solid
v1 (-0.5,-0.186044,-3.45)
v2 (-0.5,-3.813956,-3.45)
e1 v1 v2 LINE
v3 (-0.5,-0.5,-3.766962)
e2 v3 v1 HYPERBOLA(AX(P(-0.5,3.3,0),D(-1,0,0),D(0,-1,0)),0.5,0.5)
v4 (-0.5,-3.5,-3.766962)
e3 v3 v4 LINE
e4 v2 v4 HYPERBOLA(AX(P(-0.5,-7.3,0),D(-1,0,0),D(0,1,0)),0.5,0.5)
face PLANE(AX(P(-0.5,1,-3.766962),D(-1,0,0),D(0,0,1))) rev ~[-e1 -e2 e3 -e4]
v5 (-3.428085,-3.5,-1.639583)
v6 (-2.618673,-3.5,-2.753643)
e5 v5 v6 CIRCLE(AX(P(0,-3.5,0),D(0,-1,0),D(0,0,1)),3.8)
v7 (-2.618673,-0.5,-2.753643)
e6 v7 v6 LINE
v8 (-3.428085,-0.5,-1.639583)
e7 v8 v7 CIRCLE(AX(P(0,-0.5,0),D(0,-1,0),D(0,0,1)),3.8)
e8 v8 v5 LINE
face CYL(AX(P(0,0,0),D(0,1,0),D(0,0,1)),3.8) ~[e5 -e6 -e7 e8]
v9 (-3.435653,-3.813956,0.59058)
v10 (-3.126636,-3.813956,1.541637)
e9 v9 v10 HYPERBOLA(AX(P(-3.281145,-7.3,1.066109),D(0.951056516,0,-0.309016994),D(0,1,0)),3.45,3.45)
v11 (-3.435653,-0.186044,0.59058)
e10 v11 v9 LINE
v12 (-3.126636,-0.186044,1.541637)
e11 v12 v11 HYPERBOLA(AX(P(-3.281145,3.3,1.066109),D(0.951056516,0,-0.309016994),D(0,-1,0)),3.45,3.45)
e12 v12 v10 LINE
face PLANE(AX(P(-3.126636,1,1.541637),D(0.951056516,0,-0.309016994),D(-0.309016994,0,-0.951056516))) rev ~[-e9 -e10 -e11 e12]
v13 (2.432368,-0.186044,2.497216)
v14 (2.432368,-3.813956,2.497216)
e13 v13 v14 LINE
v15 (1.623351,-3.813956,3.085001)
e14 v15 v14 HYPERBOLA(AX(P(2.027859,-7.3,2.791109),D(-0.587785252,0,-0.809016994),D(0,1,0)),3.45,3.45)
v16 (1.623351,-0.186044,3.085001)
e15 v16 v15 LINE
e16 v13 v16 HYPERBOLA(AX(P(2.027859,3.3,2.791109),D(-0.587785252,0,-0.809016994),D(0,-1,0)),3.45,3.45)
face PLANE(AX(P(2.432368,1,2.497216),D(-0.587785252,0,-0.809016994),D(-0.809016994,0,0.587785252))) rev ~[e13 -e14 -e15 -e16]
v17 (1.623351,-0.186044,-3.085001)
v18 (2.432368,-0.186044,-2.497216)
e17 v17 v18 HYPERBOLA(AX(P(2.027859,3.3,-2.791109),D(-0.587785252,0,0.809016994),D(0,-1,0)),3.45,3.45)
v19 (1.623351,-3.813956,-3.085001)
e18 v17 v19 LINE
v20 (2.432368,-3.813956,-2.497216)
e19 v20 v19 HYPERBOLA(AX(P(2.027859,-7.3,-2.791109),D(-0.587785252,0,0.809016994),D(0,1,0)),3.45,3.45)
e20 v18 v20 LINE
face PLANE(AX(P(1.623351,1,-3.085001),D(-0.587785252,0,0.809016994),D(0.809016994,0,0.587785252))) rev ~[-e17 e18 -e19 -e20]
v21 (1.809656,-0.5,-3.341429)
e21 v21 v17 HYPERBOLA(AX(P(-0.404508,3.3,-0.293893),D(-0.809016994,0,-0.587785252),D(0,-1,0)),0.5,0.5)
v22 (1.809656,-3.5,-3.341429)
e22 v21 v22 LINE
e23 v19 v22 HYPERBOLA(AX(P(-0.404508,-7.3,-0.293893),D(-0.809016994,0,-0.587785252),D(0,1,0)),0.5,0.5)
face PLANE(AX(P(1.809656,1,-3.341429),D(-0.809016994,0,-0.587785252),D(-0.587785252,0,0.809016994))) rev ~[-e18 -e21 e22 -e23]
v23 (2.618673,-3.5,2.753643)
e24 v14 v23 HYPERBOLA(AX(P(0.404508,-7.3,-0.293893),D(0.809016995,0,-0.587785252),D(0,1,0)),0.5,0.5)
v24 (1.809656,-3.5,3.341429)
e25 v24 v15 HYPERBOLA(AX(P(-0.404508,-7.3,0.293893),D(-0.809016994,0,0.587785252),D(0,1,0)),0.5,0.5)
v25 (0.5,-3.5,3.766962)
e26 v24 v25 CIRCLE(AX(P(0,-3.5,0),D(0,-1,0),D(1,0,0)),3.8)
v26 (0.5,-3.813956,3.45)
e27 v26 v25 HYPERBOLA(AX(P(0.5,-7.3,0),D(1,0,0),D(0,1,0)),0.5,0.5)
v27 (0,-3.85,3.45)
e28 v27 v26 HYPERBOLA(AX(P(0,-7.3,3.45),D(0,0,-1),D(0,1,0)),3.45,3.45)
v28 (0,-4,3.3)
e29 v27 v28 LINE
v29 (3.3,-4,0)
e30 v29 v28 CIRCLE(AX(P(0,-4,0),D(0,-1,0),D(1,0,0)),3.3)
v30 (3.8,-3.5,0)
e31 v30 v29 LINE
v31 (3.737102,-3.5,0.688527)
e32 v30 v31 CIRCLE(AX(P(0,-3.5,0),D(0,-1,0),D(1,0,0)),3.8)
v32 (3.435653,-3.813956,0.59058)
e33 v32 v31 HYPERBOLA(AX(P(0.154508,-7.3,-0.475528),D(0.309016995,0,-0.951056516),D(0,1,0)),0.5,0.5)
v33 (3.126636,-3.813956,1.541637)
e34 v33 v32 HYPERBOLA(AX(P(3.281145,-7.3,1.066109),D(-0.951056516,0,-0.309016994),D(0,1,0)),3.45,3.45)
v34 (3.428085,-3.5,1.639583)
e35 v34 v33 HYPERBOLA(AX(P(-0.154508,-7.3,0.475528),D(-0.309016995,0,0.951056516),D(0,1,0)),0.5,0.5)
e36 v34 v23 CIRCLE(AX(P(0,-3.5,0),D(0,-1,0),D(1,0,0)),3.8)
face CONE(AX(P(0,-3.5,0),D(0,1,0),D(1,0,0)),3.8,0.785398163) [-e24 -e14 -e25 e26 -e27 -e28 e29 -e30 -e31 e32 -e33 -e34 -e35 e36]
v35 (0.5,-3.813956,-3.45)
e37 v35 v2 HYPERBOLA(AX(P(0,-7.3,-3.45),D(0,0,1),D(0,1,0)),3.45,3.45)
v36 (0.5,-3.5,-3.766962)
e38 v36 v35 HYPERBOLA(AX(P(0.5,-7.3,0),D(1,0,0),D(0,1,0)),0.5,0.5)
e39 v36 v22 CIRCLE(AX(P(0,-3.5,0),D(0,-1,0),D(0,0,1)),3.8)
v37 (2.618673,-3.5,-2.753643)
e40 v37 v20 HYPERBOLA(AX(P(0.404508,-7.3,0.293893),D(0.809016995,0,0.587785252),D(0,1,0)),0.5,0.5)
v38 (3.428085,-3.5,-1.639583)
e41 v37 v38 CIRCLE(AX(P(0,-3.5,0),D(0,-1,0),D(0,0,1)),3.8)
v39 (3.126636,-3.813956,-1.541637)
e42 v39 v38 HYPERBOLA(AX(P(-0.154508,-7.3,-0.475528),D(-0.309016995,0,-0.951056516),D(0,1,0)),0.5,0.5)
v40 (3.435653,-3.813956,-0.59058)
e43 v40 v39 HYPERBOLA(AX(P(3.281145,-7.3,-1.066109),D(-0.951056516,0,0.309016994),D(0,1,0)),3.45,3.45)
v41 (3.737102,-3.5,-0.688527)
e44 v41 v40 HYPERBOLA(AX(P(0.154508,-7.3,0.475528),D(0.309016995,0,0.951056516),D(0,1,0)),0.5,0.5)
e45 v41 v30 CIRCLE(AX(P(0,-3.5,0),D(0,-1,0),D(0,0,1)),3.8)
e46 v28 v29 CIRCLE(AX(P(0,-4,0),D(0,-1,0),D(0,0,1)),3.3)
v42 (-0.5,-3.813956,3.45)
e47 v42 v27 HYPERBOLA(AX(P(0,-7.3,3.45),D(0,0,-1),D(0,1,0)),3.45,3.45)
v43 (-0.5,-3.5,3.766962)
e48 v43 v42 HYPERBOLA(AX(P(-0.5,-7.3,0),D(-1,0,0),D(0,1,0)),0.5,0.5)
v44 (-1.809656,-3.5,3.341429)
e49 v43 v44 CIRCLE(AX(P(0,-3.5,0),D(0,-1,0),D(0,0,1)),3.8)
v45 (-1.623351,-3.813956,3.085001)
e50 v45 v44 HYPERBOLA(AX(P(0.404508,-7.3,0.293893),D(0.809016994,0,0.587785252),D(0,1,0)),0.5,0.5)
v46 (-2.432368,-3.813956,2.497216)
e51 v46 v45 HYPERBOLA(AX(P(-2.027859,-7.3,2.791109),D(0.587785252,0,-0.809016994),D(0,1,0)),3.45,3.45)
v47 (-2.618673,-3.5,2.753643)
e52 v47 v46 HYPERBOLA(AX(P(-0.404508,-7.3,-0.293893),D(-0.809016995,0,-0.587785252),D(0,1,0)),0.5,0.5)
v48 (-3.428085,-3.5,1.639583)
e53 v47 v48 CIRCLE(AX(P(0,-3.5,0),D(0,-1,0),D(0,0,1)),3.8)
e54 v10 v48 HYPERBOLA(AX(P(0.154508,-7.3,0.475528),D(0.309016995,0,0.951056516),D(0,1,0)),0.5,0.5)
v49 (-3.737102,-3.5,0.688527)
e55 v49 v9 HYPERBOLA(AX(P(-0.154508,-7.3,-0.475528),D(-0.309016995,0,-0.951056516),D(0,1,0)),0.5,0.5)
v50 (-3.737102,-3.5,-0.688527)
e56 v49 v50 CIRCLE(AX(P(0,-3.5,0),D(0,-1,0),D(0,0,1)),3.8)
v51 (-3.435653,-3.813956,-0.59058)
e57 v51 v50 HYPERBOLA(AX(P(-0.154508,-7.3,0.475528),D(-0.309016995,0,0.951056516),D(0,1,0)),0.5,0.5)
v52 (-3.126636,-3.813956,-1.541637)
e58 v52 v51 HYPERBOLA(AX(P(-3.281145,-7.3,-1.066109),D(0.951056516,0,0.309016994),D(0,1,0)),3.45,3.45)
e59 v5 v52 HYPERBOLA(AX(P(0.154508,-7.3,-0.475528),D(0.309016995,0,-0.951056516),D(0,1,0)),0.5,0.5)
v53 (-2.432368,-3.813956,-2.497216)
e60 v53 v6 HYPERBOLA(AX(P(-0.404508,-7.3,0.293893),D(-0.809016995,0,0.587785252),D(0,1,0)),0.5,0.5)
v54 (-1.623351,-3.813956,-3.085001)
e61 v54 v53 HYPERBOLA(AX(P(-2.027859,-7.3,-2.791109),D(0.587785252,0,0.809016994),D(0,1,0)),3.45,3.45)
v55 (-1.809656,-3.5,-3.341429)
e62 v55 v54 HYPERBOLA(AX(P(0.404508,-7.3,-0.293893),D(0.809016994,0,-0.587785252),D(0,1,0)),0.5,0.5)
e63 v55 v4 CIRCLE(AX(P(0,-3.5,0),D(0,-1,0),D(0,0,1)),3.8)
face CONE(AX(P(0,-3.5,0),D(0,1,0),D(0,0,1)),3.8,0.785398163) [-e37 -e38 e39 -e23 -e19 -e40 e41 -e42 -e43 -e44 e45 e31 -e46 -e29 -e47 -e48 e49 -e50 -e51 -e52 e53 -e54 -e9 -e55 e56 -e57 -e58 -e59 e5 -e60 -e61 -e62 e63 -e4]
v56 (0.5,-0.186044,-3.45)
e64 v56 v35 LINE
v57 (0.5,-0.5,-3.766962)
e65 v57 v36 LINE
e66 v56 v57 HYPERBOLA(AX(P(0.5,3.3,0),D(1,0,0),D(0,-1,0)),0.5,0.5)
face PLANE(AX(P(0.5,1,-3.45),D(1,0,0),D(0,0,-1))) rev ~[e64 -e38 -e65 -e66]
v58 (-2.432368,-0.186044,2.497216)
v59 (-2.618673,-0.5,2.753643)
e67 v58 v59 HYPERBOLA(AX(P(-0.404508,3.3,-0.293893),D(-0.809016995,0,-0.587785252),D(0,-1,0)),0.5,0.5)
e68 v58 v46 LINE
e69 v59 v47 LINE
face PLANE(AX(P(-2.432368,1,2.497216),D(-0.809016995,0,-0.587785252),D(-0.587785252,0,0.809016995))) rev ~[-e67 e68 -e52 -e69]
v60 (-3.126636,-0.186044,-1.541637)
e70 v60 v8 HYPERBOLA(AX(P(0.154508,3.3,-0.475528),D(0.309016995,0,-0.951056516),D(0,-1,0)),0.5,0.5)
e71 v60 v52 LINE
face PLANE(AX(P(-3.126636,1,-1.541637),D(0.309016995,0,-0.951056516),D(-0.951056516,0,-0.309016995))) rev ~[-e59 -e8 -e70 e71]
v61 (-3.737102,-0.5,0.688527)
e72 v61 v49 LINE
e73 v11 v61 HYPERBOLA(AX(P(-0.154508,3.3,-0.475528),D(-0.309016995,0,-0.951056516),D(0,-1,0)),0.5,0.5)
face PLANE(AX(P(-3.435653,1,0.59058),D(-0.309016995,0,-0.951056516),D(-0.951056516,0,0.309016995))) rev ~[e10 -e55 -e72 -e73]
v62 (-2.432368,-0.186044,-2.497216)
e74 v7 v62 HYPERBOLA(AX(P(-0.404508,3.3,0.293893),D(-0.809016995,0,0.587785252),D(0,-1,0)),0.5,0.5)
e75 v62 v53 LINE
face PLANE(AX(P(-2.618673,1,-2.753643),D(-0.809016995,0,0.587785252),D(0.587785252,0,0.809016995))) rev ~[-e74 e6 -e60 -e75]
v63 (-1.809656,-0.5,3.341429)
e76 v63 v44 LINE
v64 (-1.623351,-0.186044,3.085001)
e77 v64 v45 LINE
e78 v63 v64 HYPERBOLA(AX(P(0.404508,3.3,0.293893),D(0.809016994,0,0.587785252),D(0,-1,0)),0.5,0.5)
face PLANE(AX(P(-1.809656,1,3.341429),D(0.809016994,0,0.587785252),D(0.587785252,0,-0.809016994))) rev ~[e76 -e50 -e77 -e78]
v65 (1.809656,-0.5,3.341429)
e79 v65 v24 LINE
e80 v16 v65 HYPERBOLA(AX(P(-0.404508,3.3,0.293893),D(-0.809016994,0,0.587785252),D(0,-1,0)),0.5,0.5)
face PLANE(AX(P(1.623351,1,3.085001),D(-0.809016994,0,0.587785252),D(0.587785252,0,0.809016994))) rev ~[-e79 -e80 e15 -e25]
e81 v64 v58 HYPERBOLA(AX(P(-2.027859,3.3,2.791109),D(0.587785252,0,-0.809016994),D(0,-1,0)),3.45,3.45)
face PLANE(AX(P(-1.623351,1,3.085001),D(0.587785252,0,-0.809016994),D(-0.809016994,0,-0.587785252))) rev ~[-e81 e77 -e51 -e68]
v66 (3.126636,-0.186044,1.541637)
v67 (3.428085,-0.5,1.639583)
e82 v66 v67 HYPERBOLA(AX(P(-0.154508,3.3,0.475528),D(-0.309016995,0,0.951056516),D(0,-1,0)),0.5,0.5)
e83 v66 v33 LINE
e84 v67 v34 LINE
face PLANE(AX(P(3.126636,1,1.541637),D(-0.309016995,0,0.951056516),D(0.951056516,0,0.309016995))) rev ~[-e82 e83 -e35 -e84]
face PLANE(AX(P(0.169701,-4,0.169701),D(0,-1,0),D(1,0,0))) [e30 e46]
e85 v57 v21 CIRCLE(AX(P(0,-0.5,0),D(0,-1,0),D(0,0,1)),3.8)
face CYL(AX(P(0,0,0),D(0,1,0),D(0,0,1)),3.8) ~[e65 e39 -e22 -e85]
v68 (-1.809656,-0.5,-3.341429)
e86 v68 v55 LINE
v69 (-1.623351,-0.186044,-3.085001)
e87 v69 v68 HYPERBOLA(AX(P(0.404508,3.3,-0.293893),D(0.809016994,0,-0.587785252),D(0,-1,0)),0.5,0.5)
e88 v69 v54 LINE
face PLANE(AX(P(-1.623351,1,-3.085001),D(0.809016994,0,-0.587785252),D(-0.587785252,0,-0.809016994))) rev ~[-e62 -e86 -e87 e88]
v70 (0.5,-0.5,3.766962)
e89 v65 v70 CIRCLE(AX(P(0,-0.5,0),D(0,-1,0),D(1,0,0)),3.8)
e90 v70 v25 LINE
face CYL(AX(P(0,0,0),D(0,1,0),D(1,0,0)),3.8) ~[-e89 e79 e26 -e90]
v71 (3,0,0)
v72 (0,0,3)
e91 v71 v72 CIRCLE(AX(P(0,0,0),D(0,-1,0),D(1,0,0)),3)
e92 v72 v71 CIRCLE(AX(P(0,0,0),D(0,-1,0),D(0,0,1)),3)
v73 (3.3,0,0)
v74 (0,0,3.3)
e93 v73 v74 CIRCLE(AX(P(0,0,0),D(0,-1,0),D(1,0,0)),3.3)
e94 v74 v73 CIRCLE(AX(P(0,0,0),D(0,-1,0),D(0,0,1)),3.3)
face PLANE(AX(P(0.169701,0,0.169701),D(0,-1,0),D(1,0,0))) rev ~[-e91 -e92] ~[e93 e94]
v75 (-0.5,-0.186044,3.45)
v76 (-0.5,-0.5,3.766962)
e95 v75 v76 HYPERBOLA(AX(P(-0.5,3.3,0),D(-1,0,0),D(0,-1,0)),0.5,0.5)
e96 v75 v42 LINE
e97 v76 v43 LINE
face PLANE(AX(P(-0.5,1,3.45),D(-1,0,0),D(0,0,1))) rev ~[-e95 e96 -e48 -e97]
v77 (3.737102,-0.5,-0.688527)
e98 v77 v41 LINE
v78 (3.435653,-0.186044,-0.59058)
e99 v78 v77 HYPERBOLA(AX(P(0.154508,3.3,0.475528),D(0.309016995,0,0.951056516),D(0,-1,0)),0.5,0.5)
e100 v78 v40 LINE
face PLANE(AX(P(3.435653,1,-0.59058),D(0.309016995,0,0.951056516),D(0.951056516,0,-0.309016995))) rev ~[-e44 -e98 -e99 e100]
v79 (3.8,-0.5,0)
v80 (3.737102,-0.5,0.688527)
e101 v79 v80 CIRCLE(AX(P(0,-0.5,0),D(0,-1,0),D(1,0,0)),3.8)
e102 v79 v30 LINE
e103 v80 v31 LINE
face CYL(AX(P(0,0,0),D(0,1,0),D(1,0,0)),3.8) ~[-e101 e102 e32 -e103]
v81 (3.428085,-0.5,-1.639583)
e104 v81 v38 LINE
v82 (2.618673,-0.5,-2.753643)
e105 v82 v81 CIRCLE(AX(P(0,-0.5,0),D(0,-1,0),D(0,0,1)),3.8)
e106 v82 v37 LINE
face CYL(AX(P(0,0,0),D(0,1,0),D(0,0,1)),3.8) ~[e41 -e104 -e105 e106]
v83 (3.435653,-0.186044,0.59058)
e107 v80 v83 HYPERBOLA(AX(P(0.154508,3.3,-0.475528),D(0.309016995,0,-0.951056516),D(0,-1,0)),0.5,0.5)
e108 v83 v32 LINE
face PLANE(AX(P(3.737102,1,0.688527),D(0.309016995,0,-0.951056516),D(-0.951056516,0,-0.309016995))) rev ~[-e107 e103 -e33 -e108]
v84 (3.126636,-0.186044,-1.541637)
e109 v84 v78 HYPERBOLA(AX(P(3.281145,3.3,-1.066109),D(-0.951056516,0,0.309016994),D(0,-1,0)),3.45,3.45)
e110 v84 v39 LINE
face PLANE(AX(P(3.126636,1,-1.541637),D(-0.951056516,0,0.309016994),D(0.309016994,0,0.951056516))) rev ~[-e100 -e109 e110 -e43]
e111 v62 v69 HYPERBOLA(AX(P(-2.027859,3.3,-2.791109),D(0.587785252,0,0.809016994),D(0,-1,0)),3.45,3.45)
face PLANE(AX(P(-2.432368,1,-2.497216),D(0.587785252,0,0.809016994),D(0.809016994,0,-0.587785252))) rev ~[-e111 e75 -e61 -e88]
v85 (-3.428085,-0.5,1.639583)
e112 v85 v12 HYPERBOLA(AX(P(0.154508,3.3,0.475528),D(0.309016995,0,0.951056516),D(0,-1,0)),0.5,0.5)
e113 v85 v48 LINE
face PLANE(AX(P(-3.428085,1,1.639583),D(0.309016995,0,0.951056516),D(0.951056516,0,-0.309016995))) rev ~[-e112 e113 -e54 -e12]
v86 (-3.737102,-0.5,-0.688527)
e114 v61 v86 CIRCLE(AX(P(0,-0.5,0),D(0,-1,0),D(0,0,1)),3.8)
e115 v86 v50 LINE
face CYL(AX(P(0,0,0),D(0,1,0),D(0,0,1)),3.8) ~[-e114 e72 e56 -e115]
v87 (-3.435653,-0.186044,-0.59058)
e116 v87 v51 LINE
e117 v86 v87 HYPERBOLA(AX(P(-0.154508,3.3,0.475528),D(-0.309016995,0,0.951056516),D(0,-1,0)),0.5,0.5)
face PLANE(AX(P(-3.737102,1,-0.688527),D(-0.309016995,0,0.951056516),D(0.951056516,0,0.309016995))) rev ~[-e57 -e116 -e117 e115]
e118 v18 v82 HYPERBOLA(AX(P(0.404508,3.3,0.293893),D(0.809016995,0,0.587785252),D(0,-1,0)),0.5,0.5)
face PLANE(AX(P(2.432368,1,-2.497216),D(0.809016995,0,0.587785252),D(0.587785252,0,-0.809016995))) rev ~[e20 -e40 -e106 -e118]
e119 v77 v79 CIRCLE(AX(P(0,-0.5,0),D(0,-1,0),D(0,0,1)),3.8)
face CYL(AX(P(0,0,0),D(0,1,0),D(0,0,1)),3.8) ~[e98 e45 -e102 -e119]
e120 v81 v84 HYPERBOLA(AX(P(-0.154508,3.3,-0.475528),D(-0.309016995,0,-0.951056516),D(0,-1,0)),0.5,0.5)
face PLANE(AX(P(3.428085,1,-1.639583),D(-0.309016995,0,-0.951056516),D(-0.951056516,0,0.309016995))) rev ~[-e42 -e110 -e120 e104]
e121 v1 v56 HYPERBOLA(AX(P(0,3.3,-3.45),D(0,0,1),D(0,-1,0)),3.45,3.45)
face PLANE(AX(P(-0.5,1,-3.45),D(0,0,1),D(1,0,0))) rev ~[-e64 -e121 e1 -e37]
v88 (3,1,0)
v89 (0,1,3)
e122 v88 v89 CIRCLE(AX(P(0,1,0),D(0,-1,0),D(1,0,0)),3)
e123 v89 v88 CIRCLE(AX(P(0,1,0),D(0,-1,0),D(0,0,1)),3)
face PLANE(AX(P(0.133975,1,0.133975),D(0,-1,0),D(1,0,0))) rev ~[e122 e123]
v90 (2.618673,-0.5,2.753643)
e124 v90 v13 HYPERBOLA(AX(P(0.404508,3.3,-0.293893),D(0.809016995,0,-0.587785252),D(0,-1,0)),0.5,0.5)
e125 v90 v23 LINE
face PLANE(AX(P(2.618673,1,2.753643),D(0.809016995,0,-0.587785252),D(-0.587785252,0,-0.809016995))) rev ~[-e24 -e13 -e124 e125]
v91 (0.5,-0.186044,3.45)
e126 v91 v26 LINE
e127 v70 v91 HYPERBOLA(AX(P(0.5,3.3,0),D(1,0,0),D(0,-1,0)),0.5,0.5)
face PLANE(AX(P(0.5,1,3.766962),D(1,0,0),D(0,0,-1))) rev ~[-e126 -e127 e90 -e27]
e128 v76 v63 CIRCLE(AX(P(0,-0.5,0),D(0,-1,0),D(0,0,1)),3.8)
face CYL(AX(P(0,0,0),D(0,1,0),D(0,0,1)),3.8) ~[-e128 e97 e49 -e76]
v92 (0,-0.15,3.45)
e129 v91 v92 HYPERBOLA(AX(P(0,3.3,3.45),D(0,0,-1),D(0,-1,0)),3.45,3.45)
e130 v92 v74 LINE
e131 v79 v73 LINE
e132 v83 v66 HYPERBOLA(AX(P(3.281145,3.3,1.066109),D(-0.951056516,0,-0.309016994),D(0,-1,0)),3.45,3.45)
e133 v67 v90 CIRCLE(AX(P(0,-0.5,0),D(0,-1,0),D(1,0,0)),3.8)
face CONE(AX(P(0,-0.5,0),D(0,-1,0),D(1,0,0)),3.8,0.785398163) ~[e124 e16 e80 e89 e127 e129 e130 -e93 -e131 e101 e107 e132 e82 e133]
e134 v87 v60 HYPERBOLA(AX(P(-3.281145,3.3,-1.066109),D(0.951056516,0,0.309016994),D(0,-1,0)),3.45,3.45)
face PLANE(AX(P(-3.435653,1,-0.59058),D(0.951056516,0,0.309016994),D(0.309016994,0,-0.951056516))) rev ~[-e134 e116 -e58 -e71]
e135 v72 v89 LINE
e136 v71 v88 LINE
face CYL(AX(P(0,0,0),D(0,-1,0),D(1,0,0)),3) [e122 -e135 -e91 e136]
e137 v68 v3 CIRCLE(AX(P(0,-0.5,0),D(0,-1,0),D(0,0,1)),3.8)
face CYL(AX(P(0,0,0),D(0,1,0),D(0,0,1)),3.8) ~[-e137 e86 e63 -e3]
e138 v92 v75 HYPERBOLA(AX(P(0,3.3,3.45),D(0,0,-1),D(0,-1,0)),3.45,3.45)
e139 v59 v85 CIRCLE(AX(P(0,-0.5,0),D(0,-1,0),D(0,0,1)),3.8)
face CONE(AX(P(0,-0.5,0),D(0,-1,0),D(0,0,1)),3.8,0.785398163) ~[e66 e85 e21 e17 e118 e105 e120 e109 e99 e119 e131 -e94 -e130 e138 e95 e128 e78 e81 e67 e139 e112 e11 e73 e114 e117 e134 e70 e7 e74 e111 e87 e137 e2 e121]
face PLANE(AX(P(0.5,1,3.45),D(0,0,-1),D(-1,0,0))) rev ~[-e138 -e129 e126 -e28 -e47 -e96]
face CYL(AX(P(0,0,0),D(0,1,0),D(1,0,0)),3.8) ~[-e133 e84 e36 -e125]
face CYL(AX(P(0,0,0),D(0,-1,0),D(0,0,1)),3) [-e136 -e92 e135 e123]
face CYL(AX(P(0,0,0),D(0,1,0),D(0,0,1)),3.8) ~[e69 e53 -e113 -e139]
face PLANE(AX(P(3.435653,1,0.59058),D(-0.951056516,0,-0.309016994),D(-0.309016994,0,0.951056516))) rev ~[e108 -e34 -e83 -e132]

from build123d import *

# Parameters (mm, degrees)
F1_DEPTH = 1
F2_DEPTH = 4
F3_SIZE  = 0.5
F5_DEPTH = 10


# Not quite as in the source:
# - a feature names something its author has since deleted; it is built from what else it names


with BuildPart() as f1:
    # F0 (on Front) → F1 (new body)
    with BuildSketch(Plane.XZ):
        with BuildLine():
            ThreePointArc((3, 0), (2.1213203436, 2.1213203436), (0, 3))
            ThreePointArc((0, 3), (-2.1213203436, -2.1213203436), (3, 0))
        make_face()
    extrude(amount=-F1_DEPTH)

    # F0 (on Front) → F2 (join)
    with BuildSketch(Plane.XZ):
        with BuildLine():
            ThreePointArc((0, 3.8), (-2.6870057685, -2.6870057685), (3.8, 0))
            ThreePointArc((3.8, 0), (2.6870057685, 2.6870057685), (0, 3.8))
        make_face()
        with BuildLine():
            ThreePointArc((3, 0), (-2.1213203436, -2.1213203436), (0, 3))
            ThreePointArc((0, 3), (2.1213203436, 2.1213203436), (3, 0))
        make_face(mode=Mode.SUBTRACT)
        with BuildLine():
            ThreePointArc((3, 0), (2.1213203436, 2.1213203436), (0, 3))
            ThreePointArc((0, 3), (-2.1213203436, -2.1213203436), (3, 0))
        make_face()
    extrude(amount=F2_DEPTH)

    # F3
    f3_edges = [f1.edges().sort_by_distance(p)[0] for p in [
        (0, -4, -3.8),
        (0, 0, -3.8),
    ]]
    chamfer(f3_edges, length=F3_SIZE)

    # F4 (on face) → F5 (cut)
    with BuildSketch(Plane(origin=(0, 1, 0), x_dir=(-1, 0, 0), z_dir=(0, 1, 0))):
        with BuildLine():
            Line((-1.6233506232, 3.0850012567), (-1.809656001, 3.3414286104))
            ThreePointArc((-1.809656001, 3.3414286104), (-2.2335839587, 3.0742645786), (-2.6186729953, 2.7536433581))
            Line((-2.6186729953, 2.7536433581), (-2.4323676176, 2.4972160044))
            Line((-2.4323676176, 2.4972160044), (-1.6233506232, 3.0850012567))
        make_face()
        with BuildLine():
            Line((0, 3.45), (0, 3.8))
            ThreePointArc((0, 3.8), (-0.2505451722, 3.7917314141), (-0.5, 3.7669616404))
            Line((-0.5, 3.7669616404), (-0.5, 3.45))
            Line((-0.5, 3.45), (0, 3.45))
        make_face()
        with BuildLine():
            Line((0.5, 3.45), (0.5, 3.7669616404))
            ThreePointArc((0.5, 3.7669616404), (0.2505451722, 3.7917314141), (0, 3.8))
            Line((0, 3.8), (0, 3.45))
            Line((0, 3.45), (0.5, 3.45))
        make_face()
        with BuildLine():
            ThreePointArc((3.4280849175, -1.6395834222), (3.6140147619, -1.1742645786), (3.7371019119, -0.6885269059))
            Line((3.7371019119, -0.6885269059), (3.4356534784, -0.5905803724))
            Line((3.4356534784, -0.5905803724), (3.126636484, -1.5416368887))
            Line((3.126636484, -1.5416368887), (3.4280849175, -1.6395834222))
        make_face()
        with BuildLine():
            ThreePointArc((1.809656001, -3.3414286104), (2.2335839587, -3.0742645786), (2.6186729953, -2.7536433581))
            Line((2.6186729953, -2.7536433581), (2.4323676176, -2.4972160044))
            Line((2.4323676176, -2.4972160044), (1.6233506232, -3.0850012567))
            Line((1.6233506232, -3.0850012567), (1.809656001, -3.3414286104))
        make_face()
        with BuildLine():
            ThreePointArc((-0.5, -3.7669616404), (0, -3.8), (0.5, -3.7669616404))
            Line((0.5, -3.7669616404), (0.5, -3.45))
            Line((0.5, -3.45), (-0.5, -3.45))
            Line((-0.5, -3.45), (-0.5, -3.7669616404))
        make_face()
        with BuildLine():
            ThreePointArc((-2.6186729953, -2.7536433581), (-2.2335839587, -3.0742645786), (-1.809656001, -3.3414286104))
            Line((-1.809656001, -3.3414286104), (-1.6233506232, -3.0850012567))
            Line((-1.6233506232, -3.0850012567), (-2.4323676176, -2.4972160044))
            Line((-2.4323676176, -2.4972160044), (-2.6186729953, -2.7536433581))
        make_face()
        with BuildLine():
            ThreePointArc((-3.7371019119, -0.6885269059), (-3.6140147619, -1.1742645786), (-3.4280849175, -1.6395834222))
            Line((-3.4280849175, -1.6395834222), (-3.126636484, -1.5416368887))
            Line((-3.126636484, -1.5416368887), (-3.4356534784, -0.5905803724))
            Line((-3.4356534784, -0.5905803724), (-3.7371019119, -0.6885269059))
        make_face()
        with BuildLine():
            Line((-3.126636484, 1.5416368887), (-3.4280849175, 1.6395834222))
            ThreePointArc((-3.4280849175, 1.6395834222), (-3.6140147619, 1.1742645786), (-3.7371019119, 0.6885269059))
            Line((-3.7371019119, 0.6885269059), (-3.4356534784, 0.5905803724))
            Line((-3.4356534784, 0.5905803724), (-3.126636484, 1.5416368887))
        make_face()
        with BuildLine():
            Line((3.4356534784, 0.5905803724), (3.7371019119, 0.6885269059))
            ThreePointArc((3.7371019119, 0.6885269059), (3.6140147619, 1.1742645786), (3.4280849175, 1.6395834222))
            Line((3.4280849175, 1.6395834222), (3.126636484, 1.5416368887))
            Line((3.126636484, 1.5416368887), (3.4356534784, 0.5905803724))
        make_face()
        with BuildLine():
            Line((2.4323676176, 2.4972160044), (2.6186729953, 2.7536433581))
            ThreePointArc((2.6186729953, 2.7536433581), (2.2335839587, 3.0742645786), (1.809656001, 3.3414286104))
            Line((1.809656001, 3.3414286104), (1.6233506232, 3.0850012567))
            Line((1.6233506232, 3.0850012567), (2.4323676176, 2.4972160044))
        make_face()
    extrude(amount=-F5_DEPTH, mode=Mode.SUBTRACT)


solid = f1.part
